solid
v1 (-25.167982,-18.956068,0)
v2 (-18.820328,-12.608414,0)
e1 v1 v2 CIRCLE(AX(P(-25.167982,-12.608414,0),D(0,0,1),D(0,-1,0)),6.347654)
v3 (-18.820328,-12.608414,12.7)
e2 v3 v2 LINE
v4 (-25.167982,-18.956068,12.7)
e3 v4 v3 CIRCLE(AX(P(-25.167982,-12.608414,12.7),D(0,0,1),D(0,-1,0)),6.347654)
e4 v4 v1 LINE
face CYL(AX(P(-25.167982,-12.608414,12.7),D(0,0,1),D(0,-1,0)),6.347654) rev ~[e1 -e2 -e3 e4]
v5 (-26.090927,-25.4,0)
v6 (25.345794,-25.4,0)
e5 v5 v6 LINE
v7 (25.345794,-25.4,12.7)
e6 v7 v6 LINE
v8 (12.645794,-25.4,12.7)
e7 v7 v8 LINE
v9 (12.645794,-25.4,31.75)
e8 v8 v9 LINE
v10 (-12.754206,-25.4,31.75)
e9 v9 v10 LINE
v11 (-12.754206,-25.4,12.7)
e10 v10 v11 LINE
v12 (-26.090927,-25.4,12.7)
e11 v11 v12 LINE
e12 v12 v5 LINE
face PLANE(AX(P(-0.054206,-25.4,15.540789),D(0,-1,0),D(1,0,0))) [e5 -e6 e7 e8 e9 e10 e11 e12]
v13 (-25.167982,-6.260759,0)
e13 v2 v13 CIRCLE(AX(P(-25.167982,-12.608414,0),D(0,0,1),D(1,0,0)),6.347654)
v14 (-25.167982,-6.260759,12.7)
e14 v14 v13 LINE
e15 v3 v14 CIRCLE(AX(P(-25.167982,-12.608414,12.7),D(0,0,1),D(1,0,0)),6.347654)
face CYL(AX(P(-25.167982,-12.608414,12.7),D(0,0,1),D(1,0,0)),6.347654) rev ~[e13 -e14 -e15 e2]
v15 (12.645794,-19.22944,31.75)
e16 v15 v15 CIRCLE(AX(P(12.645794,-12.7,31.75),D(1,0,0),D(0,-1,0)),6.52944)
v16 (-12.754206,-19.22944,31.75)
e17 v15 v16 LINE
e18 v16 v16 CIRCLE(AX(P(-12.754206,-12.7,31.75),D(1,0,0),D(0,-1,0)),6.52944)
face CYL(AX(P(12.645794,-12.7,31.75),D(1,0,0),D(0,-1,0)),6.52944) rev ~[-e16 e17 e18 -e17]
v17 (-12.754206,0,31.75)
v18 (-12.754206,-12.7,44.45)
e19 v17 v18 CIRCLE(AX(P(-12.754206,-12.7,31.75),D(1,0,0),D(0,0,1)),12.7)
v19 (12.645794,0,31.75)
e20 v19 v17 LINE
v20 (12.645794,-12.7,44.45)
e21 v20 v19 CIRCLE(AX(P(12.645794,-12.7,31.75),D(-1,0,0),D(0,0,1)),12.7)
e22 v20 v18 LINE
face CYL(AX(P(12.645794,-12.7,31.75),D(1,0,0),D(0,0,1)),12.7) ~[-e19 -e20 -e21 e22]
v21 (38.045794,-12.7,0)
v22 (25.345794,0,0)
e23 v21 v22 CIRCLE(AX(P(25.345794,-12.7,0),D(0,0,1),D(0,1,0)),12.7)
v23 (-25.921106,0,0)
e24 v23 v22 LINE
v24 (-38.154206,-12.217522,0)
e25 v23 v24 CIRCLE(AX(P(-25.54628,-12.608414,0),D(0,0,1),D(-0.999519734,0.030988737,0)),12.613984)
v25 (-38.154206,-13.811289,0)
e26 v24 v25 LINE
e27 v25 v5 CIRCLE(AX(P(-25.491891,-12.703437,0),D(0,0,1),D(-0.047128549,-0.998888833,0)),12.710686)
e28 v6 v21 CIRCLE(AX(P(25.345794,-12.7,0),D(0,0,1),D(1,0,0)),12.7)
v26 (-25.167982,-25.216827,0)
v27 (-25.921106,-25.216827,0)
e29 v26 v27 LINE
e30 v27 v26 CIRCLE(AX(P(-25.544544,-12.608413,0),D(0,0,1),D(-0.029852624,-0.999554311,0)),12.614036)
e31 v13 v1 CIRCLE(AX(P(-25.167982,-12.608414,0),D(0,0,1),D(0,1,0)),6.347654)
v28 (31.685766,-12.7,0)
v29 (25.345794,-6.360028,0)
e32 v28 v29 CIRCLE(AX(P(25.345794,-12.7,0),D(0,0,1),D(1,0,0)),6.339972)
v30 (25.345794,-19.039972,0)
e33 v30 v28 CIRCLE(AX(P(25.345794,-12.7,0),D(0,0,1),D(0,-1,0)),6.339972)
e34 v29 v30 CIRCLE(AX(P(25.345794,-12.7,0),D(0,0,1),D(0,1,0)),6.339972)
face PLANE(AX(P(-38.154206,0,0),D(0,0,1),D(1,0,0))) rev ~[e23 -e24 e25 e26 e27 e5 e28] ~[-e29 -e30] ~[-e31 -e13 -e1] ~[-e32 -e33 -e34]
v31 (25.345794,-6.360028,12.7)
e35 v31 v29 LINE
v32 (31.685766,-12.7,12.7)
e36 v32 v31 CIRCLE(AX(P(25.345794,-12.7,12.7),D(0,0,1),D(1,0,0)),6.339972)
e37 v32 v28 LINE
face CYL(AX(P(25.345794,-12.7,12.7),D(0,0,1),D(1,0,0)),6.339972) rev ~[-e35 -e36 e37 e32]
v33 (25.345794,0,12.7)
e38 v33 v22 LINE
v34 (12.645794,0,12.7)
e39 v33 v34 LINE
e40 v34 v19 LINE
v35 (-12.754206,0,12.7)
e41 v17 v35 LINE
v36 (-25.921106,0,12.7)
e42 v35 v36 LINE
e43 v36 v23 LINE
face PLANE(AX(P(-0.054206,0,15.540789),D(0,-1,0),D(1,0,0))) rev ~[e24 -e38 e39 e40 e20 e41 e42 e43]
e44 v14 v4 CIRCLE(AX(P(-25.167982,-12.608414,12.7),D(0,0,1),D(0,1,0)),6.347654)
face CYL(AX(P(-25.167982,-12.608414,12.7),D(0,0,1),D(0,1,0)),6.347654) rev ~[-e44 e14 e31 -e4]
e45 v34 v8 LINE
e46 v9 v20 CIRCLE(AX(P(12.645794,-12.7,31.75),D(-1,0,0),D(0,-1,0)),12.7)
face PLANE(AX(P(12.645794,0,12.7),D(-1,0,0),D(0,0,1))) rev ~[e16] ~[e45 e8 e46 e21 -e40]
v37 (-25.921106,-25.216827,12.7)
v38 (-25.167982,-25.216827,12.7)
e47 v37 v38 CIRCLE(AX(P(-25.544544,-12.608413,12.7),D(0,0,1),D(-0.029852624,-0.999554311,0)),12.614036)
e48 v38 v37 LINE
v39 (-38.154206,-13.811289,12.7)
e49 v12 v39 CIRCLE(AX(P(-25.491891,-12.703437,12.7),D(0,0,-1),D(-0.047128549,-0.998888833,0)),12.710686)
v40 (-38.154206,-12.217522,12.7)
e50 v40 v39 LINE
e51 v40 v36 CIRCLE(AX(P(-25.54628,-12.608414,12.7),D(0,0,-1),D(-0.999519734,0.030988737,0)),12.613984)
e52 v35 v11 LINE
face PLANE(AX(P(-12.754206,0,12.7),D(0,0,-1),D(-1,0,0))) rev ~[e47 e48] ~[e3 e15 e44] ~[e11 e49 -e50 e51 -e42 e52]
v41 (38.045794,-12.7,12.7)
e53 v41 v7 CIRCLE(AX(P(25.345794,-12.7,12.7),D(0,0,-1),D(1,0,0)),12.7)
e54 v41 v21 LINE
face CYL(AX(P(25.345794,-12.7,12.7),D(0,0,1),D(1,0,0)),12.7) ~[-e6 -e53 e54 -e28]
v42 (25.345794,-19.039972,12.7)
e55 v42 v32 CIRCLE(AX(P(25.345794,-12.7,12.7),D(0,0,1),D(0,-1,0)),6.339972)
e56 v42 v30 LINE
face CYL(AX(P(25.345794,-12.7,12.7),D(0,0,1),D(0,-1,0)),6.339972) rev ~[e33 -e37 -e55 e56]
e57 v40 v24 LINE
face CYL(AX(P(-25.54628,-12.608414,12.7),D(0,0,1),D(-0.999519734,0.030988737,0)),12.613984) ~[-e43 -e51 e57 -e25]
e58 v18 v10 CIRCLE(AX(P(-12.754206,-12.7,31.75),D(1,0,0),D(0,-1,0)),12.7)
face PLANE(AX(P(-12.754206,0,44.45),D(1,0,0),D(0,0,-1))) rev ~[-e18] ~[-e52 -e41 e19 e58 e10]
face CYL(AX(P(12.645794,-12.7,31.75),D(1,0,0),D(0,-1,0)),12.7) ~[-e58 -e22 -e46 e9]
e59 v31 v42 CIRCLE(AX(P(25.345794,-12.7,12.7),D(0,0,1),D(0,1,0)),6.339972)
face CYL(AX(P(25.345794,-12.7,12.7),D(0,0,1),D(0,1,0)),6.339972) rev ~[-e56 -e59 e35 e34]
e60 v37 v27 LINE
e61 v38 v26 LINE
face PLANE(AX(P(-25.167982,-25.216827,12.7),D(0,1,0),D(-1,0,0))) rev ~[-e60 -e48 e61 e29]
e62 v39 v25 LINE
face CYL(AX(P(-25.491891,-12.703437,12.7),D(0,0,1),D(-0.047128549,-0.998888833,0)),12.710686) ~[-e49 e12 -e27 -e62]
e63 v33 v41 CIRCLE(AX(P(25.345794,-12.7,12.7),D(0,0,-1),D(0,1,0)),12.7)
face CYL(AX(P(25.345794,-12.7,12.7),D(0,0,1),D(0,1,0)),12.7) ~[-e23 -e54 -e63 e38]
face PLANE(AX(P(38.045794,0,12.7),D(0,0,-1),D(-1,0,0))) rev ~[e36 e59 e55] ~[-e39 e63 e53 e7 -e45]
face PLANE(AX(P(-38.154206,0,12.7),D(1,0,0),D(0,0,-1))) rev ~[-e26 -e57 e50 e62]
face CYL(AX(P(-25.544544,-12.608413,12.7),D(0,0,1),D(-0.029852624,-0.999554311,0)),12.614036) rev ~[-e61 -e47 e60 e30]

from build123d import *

# Parameters (mm, degrees)
F1_DEPTH = 25.4
F3_DEPTH = 50.801
F5_DEPTH = 12.701
F7_DEPTH = 12.701
F9_DEPTH = 12.701


with BuildPart() as f1:
    # F0 (on Front) → F1 (new body)
    with BuildSketch(Plane.XZ):
        Polygon((-38.1542058029, 12.7), (-38.1542058029, 0), (38.0457941971, 0), (38.0457941971, 12.7), (12.6457941971, 12.7), (12.6457941971, 44.45), (-12.7542058029, 44.45), (-12.7542058029, 12.7), align=None)
    extrude(amount=F1_DEPTH)

    # F2 (on face) → F3 (cut, through all)
    with BuildSketch(Plane.YZ.offset(12.6457941971)):
        with BuildLine():
            Line((-19.2294398129, 31.75), (-6.1705601871, 31.75))
            ThreePointArc((-6.1705601871, 31.75), (-12.7, 38.2794398129), (-19.2294398129, 31.75))
        make_face()
        with BuildLine():
            ThreePointArc((-19.2294398129, 31.75), (-12.7, 25.2205601871), (-6.1705601871, 31.75))
            Line((-6.1705601871, 31.75), (-19.2294398129, 31.75))
        make_face()
        with BuildLine():
            ThreePointArc((-25.4, 31.75), (-21.6802561211, 40.7302561211), (-12.7, 44.45))
            Line((-12.7, 44.45), (-25.4, 44.45))
            Line((-25.4, 44.45), (-25.4, 31.75))
        make_face()
        with BuildLine():
            ThreePointArc((-12.7, 44.45), (-3.7197438789, 40.7302561211), (0, 31.75))
            Line((0, 31.75), (0, 44.45))
            Line((0, 44.45), (-12.7, 44.45))
        make_face()
    extrude(amount=-F3_DEPTH, mode=Mode.SUBTRACT)

    # F4 (on face) → F5 (cut, through all)
    with BuildSketch(Plane.XY.offset(12.7)):
        with BuildLine():
            Line((-25.1679819405, -25.2168271691), (-25.9211060628, -25.2168271691))
            ThreePointArc((-25.9211060628, -25.2168271691), (-25.5445440017, -25.2224491047), (-25.1679819405, -25.2168271691))
        make_face()
        with BuildLine():
            ThreePointArc((25.3457941971, -6.3600277162), (19.0058219133, -12.7), (25.3457941971, -19.0399722838))
            Line((25.3457941971, -19.0399722838), (25.3457941971, -6.3600277162))
        make_face()
        with BuildLine():
            Line((25.3457941971, -6.3600277162), (25.3457941971, -19.0399722838))
            ThreePointArc((25.3457941971, -19.0399722838), (29.8288315915, -17.1830373944), (31.6857664808, -12.7))
            ThreePointArc((31.6857664808, -12.7), (29.8288315915, -8.2169626056), (25.3457941971, -6.3600277162))
        make_face()
        with BuildLine():
            Line((-25.1679819405, -18.9560678934), (-25.1679819405, -6.2607592757))
            ThreePointArc((-25.1679819405, -6.2607592757), (-31.5156362493, -12.6084135845), (-25.1679819405, -18.9560678934))
        make_face()
        with BuildLine():
            ThreePointArc((-18.8203276317, -12.6084135845), (-20.6795125341, -8.1199441781), (-25.1679819405, -6.2607592757))
            Line((-25.1679819405, -6.2607592757), (-25.1679819405, -18.9560678934))
            ThreePointArc((-25.1679819405, -18.9560678934), (-20.6795125341, -17.0968829909), (-18.8203276317, -12.6084135845))
        make_face()
        with BuildLine():
            ThreePointArc((25.3457941971, 0), (34.3260503181, -3.7197438789), (38.0457941971, -12.7))
            Line((38.0457941971, -12.7), (38.0457941971, 0))
            Line((38.0457941971, 0), (25.3457941971, 0))
        make_face()
        with BuildLine():
            ThreePointArc((38.0457941971, -12.7), (34.3260503181, -21.6802561211), (25.3457941971, -25.4))
            Line((25.3457941971, -25.4), (38.0457941971, -25.4))
            Line((38.0457941971, -25.4), (38.0457941971, -12.7))
        make_face()
    extrude(amount=-F5_DEPTH, mode=Mode.SUBTRACT)

    # F6 (on face) → F7 (cut, through all)
    with BuildSketch(Plane.XY.offset(12.7)):
        with BuildLine():
            ThreePointArc((-38.1542058029, -12.2175221546), (-34.4600291378, -3.683299298), (-25.9211060628, 0))
            Line((-25.9211060628, 0), (-38.1542058029, 0))
            Line((-38.1542058029, 0), (-38.1542058029, -12.2175221546))
        make_face()
    extrude(amount=-F7_DEPTH, mode=Mode.SUBTRACT)

    # F8 (on face) → F9 (cut, through all)
    with BuildSketch(Plane.XY.offset(12.7)):
        with BuildLine():
            Line((-38.1542058029, -25.4), (-26.090927422, -25.4))
            ThreePointArc((-26.090927422, -25.4), (-34.2975944615, -21.8697418221), (-38.1542058029, -13.8112893863))
            Line((-38.1542058029, -13.8112893863), (-38.1542058029, -25.4))
        make_face()
    extrude(amount=-F9_DEPTH, mode=Mode.SUBTRACT)


solid = f1.part
